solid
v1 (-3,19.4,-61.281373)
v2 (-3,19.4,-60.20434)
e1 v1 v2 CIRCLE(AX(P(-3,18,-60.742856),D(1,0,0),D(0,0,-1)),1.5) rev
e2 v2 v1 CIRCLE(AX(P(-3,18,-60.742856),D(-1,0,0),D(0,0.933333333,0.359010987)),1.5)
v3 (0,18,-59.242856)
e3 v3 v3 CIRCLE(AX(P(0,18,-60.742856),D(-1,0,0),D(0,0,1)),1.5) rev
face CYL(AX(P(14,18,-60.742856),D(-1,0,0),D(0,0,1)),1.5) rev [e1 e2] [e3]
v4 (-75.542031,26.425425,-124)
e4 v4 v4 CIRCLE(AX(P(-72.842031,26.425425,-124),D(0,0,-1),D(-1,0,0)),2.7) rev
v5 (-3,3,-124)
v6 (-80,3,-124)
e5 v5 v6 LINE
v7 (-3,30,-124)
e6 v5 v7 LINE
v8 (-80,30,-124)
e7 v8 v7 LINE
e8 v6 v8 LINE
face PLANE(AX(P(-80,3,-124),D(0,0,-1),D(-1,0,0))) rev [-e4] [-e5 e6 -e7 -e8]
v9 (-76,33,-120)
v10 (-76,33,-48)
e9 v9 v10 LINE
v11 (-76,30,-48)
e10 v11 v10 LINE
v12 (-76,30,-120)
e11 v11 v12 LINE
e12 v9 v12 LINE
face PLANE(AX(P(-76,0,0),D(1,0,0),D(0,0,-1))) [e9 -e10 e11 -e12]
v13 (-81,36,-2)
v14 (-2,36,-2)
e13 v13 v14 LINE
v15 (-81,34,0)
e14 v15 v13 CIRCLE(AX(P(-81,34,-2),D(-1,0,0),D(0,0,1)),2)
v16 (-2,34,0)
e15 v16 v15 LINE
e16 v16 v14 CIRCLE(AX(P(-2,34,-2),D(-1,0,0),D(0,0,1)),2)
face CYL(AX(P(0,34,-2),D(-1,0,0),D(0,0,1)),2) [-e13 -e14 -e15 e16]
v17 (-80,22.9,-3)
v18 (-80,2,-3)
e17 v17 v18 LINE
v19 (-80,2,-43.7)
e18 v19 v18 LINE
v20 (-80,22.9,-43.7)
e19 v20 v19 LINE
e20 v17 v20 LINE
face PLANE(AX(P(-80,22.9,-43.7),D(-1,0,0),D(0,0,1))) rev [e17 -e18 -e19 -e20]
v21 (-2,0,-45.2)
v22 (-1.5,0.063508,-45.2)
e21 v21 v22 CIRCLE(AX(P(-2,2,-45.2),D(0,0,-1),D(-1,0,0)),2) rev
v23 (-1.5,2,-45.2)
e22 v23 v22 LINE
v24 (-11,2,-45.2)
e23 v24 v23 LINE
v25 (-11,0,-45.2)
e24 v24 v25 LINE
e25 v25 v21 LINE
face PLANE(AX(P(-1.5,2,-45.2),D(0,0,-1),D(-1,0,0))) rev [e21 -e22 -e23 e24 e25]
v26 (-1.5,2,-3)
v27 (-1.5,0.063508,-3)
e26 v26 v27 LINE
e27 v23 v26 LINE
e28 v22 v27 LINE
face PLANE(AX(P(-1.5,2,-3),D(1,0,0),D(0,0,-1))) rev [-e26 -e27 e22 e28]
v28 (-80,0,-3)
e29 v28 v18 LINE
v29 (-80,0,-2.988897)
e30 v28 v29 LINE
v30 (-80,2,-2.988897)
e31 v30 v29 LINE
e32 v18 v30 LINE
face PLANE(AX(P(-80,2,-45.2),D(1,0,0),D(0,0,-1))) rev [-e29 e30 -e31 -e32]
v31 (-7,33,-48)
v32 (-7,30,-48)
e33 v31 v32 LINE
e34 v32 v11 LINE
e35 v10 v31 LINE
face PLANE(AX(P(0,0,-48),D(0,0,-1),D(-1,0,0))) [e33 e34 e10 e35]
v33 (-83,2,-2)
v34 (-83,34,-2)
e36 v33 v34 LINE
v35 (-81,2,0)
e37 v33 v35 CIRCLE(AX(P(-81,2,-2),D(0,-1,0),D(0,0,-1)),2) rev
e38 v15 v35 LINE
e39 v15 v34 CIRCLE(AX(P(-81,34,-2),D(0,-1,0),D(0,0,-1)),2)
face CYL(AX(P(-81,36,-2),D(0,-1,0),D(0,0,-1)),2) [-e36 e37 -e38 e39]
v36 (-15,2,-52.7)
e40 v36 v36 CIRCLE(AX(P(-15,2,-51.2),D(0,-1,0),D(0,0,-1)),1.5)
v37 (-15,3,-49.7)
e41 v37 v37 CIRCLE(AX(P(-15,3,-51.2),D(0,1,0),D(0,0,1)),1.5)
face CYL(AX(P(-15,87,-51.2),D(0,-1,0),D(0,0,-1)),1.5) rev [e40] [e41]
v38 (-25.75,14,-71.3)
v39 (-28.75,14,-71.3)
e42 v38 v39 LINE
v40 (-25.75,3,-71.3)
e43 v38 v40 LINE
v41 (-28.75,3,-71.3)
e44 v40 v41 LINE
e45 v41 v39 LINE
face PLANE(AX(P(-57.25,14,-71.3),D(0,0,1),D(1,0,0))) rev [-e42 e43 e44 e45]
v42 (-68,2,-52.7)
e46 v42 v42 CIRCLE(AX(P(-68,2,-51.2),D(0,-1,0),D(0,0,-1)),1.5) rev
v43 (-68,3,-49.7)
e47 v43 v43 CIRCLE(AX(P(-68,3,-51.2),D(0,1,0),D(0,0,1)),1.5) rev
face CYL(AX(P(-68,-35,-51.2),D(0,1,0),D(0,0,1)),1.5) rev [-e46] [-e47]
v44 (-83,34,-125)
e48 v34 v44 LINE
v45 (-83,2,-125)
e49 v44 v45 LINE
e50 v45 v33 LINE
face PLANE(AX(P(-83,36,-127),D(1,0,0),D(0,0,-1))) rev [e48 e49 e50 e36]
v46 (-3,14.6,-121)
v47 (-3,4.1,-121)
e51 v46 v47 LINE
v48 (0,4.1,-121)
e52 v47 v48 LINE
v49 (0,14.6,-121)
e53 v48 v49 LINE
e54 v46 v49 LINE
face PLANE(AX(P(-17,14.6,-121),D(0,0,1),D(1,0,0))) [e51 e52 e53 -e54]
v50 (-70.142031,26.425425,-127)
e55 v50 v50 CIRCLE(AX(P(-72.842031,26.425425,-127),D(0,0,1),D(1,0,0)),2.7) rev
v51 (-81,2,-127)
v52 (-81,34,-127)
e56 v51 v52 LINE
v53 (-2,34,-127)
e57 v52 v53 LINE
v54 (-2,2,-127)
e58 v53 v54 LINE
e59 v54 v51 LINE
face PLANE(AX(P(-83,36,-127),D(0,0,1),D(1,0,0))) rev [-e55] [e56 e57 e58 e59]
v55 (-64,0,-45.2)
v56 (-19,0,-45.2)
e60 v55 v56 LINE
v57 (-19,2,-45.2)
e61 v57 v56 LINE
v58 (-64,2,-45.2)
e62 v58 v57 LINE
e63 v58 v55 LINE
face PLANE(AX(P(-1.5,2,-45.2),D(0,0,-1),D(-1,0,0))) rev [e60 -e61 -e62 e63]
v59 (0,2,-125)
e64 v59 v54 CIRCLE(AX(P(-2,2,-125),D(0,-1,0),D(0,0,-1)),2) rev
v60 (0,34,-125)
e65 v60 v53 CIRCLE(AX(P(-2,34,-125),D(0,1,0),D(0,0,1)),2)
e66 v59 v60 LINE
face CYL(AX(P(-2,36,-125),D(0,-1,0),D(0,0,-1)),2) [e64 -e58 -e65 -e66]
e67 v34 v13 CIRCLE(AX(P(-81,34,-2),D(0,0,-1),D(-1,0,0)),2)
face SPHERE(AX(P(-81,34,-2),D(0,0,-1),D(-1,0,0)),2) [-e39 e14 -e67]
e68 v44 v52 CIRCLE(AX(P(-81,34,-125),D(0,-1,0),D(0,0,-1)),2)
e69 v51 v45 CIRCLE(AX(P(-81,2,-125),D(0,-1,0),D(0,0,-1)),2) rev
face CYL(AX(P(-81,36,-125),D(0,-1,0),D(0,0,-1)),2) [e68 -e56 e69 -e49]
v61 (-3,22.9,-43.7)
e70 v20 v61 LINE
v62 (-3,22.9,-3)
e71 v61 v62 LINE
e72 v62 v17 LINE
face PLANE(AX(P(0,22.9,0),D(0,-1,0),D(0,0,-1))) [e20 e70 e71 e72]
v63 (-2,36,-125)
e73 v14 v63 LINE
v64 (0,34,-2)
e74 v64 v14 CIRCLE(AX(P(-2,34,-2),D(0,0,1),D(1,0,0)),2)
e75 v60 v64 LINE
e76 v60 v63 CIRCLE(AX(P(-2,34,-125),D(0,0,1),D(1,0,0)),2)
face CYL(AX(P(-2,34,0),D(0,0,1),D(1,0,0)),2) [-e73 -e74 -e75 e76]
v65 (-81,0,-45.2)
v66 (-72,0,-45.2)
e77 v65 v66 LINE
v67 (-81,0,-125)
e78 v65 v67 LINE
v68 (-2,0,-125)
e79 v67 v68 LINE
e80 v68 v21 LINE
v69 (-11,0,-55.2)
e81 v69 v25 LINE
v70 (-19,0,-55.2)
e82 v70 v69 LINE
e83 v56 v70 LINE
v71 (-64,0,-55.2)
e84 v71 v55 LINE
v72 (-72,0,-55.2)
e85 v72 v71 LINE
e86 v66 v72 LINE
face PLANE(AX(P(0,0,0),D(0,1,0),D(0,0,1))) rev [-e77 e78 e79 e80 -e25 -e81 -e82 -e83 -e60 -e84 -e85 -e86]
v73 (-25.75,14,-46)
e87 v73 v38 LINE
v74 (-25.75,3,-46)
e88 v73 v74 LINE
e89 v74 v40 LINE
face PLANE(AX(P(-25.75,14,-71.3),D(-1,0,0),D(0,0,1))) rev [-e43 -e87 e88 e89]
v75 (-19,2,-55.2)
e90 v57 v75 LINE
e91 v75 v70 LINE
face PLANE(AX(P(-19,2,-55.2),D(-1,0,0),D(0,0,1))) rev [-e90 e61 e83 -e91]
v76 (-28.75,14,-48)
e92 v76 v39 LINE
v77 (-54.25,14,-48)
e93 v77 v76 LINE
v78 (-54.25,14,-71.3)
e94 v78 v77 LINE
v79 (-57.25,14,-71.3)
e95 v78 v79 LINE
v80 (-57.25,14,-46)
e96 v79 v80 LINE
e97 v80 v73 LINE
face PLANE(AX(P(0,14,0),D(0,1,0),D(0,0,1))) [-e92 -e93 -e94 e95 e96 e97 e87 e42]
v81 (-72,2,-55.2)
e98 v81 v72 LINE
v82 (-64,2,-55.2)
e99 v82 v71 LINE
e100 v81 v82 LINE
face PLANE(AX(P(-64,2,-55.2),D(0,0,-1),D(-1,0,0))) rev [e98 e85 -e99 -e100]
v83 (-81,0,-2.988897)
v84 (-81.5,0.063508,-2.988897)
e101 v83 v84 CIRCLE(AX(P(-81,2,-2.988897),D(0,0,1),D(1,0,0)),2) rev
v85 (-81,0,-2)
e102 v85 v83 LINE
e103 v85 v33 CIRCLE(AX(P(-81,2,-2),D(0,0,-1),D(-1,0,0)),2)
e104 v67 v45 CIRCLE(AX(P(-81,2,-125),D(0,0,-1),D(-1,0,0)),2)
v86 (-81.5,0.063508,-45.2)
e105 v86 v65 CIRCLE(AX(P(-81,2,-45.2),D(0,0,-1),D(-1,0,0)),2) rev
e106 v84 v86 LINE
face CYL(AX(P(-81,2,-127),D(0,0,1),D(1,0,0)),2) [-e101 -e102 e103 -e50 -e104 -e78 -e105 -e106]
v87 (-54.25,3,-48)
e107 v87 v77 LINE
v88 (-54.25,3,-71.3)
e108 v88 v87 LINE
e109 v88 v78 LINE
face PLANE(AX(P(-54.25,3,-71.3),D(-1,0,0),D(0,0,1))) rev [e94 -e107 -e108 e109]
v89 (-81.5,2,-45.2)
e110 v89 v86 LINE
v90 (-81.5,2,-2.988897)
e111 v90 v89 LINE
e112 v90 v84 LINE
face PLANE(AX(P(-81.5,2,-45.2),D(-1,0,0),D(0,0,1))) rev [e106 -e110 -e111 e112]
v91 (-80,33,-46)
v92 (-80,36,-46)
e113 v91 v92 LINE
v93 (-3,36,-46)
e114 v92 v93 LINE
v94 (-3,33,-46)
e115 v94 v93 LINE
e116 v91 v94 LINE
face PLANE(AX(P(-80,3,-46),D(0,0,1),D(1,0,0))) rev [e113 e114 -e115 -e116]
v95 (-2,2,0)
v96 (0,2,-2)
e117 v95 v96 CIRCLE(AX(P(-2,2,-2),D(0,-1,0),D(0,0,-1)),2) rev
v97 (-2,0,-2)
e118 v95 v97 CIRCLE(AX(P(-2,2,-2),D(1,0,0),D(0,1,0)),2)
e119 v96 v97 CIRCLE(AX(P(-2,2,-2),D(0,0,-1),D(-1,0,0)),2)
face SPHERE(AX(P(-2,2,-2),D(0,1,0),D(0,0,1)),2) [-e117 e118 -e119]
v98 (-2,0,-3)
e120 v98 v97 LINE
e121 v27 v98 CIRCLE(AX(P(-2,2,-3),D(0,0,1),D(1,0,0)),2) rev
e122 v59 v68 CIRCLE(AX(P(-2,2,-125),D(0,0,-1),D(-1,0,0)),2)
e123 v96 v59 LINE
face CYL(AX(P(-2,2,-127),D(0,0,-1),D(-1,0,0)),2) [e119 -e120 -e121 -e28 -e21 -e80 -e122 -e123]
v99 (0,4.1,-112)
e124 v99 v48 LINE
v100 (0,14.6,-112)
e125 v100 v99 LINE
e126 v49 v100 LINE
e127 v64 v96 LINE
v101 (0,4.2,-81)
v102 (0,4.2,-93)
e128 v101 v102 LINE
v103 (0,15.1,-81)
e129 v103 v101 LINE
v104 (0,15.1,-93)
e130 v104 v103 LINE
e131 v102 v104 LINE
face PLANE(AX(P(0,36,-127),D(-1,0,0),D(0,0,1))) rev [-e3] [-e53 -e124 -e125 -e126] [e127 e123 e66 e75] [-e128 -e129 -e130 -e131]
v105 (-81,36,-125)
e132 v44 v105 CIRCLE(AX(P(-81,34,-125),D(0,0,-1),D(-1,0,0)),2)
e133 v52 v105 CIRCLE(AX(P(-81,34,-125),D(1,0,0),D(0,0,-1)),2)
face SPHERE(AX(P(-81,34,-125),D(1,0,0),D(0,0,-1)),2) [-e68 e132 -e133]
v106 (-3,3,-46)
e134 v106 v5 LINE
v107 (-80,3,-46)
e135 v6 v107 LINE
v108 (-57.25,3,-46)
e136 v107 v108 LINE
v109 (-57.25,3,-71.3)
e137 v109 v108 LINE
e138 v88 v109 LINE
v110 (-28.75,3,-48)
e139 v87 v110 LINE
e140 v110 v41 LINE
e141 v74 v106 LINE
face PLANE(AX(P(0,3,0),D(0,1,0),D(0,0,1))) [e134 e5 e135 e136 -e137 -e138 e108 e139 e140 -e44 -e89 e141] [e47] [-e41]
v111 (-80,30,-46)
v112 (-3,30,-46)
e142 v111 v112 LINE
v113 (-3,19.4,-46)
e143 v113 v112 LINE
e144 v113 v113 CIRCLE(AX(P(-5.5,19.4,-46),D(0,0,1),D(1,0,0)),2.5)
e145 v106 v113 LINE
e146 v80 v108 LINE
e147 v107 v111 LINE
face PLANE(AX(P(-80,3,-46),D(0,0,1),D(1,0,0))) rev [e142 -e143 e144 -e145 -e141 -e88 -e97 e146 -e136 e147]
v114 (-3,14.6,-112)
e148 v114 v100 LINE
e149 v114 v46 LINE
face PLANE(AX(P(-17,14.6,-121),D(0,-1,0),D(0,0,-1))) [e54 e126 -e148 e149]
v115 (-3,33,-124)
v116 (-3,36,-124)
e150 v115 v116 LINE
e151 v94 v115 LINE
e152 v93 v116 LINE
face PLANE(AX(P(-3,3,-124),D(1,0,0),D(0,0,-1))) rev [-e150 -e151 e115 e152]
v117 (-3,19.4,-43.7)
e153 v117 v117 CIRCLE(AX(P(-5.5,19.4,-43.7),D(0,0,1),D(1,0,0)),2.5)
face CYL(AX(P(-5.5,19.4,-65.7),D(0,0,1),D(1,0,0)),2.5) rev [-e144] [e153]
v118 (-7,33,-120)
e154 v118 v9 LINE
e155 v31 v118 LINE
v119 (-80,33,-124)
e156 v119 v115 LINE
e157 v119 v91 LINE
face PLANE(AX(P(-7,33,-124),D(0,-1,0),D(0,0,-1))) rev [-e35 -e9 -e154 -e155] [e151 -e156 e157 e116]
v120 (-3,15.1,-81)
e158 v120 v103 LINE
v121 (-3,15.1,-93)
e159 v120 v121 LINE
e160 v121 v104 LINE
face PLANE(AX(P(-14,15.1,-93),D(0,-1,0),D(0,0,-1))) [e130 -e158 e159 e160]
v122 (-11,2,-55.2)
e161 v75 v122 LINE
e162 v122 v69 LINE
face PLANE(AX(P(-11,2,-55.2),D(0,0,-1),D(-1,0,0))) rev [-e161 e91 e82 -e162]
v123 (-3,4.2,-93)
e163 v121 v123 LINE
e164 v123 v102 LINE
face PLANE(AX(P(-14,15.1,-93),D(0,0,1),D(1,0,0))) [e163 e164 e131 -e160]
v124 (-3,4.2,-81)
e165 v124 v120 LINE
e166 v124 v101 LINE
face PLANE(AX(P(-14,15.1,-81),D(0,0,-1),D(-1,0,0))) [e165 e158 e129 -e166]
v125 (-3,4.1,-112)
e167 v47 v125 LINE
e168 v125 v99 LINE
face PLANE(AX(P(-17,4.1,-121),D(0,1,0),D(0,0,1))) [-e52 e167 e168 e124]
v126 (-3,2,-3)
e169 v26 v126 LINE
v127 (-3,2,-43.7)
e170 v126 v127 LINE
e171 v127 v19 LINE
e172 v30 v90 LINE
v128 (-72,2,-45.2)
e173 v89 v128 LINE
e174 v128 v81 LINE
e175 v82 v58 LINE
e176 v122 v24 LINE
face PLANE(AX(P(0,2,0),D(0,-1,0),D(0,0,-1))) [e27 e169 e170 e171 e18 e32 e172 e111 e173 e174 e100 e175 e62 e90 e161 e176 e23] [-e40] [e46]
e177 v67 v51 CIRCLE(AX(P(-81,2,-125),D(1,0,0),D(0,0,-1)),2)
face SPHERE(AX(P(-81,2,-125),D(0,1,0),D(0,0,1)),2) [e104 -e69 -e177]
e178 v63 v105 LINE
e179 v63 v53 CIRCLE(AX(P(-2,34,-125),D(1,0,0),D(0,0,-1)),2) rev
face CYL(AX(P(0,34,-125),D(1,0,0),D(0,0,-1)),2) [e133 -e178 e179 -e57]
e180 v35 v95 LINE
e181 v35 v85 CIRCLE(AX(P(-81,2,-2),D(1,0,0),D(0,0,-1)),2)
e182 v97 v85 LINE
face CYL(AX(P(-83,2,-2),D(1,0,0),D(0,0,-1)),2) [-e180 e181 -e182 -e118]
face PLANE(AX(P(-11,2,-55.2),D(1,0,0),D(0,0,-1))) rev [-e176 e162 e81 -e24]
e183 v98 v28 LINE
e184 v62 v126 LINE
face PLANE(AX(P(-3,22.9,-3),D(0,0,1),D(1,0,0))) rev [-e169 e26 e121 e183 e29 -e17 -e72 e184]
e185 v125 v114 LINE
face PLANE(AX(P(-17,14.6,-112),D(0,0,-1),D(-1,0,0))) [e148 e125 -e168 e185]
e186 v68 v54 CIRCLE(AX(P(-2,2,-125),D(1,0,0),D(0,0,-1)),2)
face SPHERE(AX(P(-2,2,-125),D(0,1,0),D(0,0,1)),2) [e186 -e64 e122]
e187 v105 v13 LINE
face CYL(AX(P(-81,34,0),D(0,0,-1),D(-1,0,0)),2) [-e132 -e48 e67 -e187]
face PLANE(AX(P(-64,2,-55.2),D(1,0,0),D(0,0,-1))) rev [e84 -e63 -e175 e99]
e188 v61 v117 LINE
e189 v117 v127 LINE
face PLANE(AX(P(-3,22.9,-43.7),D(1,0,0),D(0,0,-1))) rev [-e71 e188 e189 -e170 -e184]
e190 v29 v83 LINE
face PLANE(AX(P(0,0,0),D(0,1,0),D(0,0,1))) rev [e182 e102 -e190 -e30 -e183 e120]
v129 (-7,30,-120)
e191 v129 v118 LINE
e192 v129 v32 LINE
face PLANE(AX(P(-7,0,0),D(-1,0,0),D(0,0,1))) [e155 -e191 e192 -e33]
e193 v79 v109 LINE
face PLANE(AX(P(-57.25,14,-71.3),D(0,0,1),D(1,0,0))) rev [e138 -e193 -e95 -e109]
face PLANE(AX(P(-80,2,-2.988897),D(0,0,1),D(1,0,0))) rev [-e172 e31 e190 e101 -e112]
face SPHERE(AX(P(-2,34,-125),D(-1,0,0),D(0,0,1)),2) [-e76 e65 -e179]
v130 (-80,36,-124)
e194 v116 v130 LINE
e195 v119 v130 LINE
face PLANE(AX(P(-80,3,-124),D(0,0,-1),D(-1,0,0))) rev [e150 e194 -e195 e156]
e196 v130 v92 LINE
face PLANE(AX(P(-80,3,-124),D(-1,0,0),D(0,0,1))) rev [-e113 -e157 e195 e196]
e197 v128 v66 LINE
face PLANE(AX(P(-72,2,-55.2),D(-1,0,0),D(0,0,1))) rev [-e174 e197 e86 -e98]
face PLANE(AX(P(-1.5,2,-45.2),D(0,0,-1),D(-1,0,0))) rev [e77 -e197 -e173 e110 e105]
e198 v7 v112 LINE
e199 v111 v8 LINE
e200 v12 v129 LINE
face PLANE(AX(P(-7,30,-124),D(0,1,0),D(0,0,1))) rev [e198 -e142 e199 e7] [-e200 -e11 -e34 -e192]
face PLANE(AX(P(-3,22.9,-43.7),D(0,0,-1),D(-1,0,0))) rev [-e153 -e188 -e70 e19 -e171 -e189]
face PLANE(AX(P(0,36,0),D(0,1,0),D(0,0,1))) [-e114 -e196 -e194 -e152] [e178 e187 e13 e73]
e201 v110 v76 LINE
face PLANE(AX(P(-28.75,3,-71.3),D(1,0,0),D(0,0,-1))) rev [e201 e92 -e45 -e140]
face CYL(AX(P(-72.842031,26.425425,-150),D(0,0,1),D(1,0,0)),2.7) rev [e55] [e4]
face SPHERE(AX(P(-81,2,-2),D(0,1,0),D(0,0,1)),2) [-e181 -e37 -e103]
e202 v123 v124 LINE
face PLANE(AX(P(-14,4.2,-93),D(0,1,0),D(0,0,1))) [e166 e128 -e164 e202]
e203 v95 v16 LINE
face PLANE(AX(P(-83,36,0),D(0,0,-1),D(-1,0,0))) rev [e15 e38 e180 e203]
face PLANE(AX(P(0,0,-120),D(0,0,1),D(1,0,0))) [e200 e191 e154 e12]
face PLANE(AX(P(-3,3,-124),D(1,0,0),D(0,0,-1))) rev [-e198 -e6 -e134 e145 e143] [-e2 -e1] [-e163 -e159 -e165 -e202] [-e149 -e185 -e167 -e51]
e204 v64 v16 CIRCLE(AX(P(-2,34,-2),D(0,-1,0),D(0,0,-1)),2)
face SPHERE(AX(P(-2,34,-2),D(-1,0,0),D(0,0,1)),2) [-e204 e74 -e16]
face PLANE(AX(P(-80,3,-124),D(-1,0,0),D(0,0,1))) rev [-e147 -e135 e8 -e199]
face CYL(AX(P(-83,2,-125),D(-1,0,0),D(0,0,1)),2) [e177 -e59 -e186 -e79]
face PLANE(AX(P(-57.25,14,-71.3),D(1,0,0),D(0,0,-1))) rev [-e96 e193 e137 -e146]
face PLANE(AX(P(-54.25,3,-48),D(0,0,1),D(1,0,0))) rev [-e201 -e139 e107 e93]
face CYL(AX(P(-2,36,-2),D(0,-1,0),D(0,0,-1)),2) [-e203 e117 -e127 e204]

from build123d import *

# Parameters (mm, degrees)
SKETCH_1_W                = 83
SKETCH_1_H                = 127
EXTRUDE_1_DEPTH           = 36
SKETCH_2_W                = 77
SKETCH_2_H                = 40.7
CUT_EXTRUDE_1_DEPTH       = 22.9
SKETCH_3_W                = 77
SKETCH_3_H                = 78
CUT_EXTRUDE_4_DEPTH       = 33
SKETCH_4_W                = 31.5
SKETCH_4_H                = 25.3
EXTRUDE_2_DEPTH           = 11
SKETCH_5_W                = 25.5
SKETCH_5_H                = 23.3
CUT_EXTRUDE_5_DEPTH       = 11
CUT_EXTRUDE_6_DEPTH       = 14
CUT_EXTRUDE_6_DEPTH_BACK  = 10
SKETCH_6_R                = 1.5
SKETCH_7_R                = 2.5
CUT_EXTRUDE_7_DEPTH       = 22
CUT_EXTRUDE_8_DEPTH       = 23
CUT_EXTRUDE_8_DEPTH_BACK  = 30
SKETCH_8_R                = 2.7
CUT_EXTRUDE_9_DEPTH       = 11
CUT_EXTRUDE_9_DEPTH_BACK  = 33
SKETCH_9_W                = 12
SKETCH_9_H                = 10.9
CUT_EXTRUDE_10_DEPTH      = 14
CUT_EXTRUDE_10_DEPTH_BACK = 36
SKETCH_10_W               = 9
SKETCH_10_H               = 10.5
SKETCH_11_W               = 78
SKETCH_11_H               = 3
EXTRUDE_3_DEPTH           = 4
SKETCH_12_W               = 69
SKETCH_12_H               = 3
EXTRUDE_4_DEPTH           = 4
SKETCH_13_W               = 78
SKETCH_13_H               = 3
EXTRUDE_5_DEPTH           = 4
SKETCH_15_W               = 69
SKETCH_15_H               = 3
EXTRUDE_6_DEPTH           = 2
SKETCH_16_W               = 1.5
SKETCH_16_H               = 41.5
CUT_EXTRUDE_11_DEPTH      = 2
SKETCH_17_W               = 78.5
SKETCH_17_H               = 1.5
CUT_EXTRUDE_12_DEPTH      = 2
SKETCH_19_W               = 1.5
SKETCH_19_H               = 42.211102857
CUT_EXTRUDE_13_DEPTH      = 2
FILLET_1_R                = 2
FILLET_2_R                = 2
FILLET_3_R                = 2
FILLET_4_R                = 2
FILLET_5_R                = 2
SKETCH_20_W               = 8
SKETCH_20_H               = 10
CUT_EXTRUDE_14_DEPTH      = 2
SKETCH_21_W               = 8
SKETCH_21_H               = 10
CUT_EXTRUDE_15_DEPTH      = 2
CUT_EXTRUDE_16_DEPTH      = 102
CUT_EXTRUDE_16_DEPTH_BACK = 85
SKETCH_22_R               = 1.5
CUT_EXTRUDE_17_DEPTH      = 37
CUT_EXTRUDE_17_DEPTH_BACK = 68
SKETCH_23_R               = 1.5


with BuildPart() as part:
    # Эскиз1 → Бобышка-Вытянуть1 (new body)
    with BuildSketch(Plane(origin=(0, 0, 0), x_dir=(1, 0, 0), z_dir=(0, 1, 0))):
        with Locations((-41.5, 63.5)):
            Rectangle(SKETCH_1_W, SKETCH_1_H)
    extrude(amount=EXTRUDE_1_DEPTH)

    # Эскиз2 → Вырез-Вытянуть1 (cut)
    with BuildSketch(Plane(origin=(0, 0, 0), x_dir=(-1, 0, 0), z_dir=(0, -1, 0))):
        with Locations((41.5, 23.35)):
            Rectangle(SKETCH_2_W, SKETCH_2_H)
    extrude(amount=-CUT_EXTRUDE_1_DEPTH, mode=Mode.SUBTRACT)

    # Эскиз3 → Вырез-Вытянуть4 (cut)
    with BuildSketch(Plane(origin=(0, 36, 0), x_dir=(1, 0, 0), z_dir=(0, 1, 0))):
        with Locations((-41.5, 85)):
            Rectangle(SKETCH_3_W, SKETCH_3_H)
    extrude(amount=-CUT_EXTRUDE_4_DEPTH, mode=Mode.SUBTRACT)

    # Эскиз4 → Бобышка-Вытянуть2 (add)
    with BuildSketch(Plane(origin=(0, 3, 0), x_dir=(1, 0, 0), z_dir=(0, 1, 0))):
        with Locations((-41.5, 58.65)):
            Rectangle(SKETCH_4_W, SKETCH_4_H)
    extrude(amount=EXTRUDE_2_DEPTH)

    # Эскиз5 → Вырез-Вытянуть5 (cut)
    with BuildSketch(Plane(origin=(0, 14, 0), x_dir=(1, 0, 0), z_dir=(0, 1, 0))):
        with Locations((-41.5, 59.65)):
            Rectangle(SKETCH_5_W, SKETCH_5_H)
    extrude(amount=-CUT_EXTRUDE_5_DEPTH, mode=Mode.SUBTRACT)

    # Эскиз6 → Вырез-Вытянуть6 (cut, two sides: drawn at the far end of the back side and taken through both)
    with BuildSketch(Plane(origin=(0, 0, 0), x_dir=(0, 0, -1), z_dir=(1, 0, 0)).offset(-CUT_EXTRUDE_6_DEPTH_BACK)):
        with Locations(Location((60.742856383, 18, 0), (0, 0, 180))):
            Circle(SKETCH_6_R)
    extrude(amount=CUT_EXTRUDE_6_DEPTH + CUT_EXTRUDE_6_DEPTH_BACK, mode=Mode.SUBTRACT)

    # Эскиз7 → Вырез-Вытянуть7 (cut)
    with BuildSketch(Plane.XY.offset(-43.7)):
        with Locations((-5.5, 19.4)):
            Circle(SKETCH_7_R)
    extrude(amount=-CUT_EXTRUDE_7_DEPTH, mode=Mode.SUBTRACT)

    # Эскиз8 → Вырез-Вытянуть8 (cut, two sides: drawn at the far end of the back side and taken through both)
    with BuildSketch(Plane(origin=(0, 0, -127), x_dir=(-1, 0, 0), z_dir=(0, 0, -1)).offset(-CUT_EXTRUDE_8_DEPTH_BACK)):
        with Locations(Location((72.842031124, 26.425424665, 0), (0, 0, 180))):
            Circle(SKETCH_8_R)
    extrude(amount=CUT_EXTRUDE_8_DEPTH + CUT_EXTRUDE_8_DEPTH_BACK, mode=Mode.SUBTRACT)

    # Эскиз9 → Вырез-Вытянуть9 (cut, two sides: drawn at the far end of the back side and taken through both)
    with BuildSketch(Plane.ZY.offset(3).offset(-CUT_EXTRUDE_9_DEPTH_BACK)):
        with Locations((-87, 9.65)):
            Rectangle(SKETCH_9_W, SKETCH_9_H)
    extrude(amount=CUT_EXTRUDE_9_DEPTH + CUT_EXTRUDE_9_DEPTH_BACK, mode=Mode.SUBTRACT)

    # Эскиз10 → Вырез-Вытянуть10 (cut, two sides: drawn at the far end of the back side and taken through both)
    with BuildSketch(Plane.ZY.offset(3).offset(-CUT_EXTRUDE_10_DEPTH_BACK)):
        with Locations((-116.5, 9.35)):
            Rectangle(SKETCH_10_W, SKETCH_10_H)
    extrude(amount=CUT_EXTRUDE_10_DEPTH + CUT_EXTRUDE_10_DEPTH_BACK, mode=Mode.SUBTRACT)

    # Эскиз11 → Бобышка-Вытянуть3 (add)
    with BuildSketch(Plane.ZY.offset(3)):
        with Locations((-85, 31.5)):
            Rectangle(SKETCH_11_W, SKETCH_11_H)
    extrude(amount=EXTRUDE_3_DEPTH)

    # Эскиз12 → Бобышка-Вытянуть4 (add)
    with BuildSketch(Plane.XY.offset(-124)):
        with Locations((-41.5, 31.5)):
            Rectangle(SKETCH_12_W, SKETCH_12_H)
    extrude(amount=EXTRUDE_4_DEPTH)

    # Эскиз13 → Бобышка-Вытянуть5 (add)
    with BuildSketch(Plane(origin=(-80, 0, 0), x_dir=(0, 0, -1), z_dir=(1, 0, 0))):
        with Locations((85, 31.5)):
            Rectangle(SKETCH_13_W, SKETCH_13_H)
    extrude(amount=EXTRUDE_5_DEPTH)

    # Эскиз15 → Бобышка-Вытянуть6 (add)
    with BuildSketch(Plane(origin=(0, 0, -46), x_dir=(-1, 0, 0), z_dir=(0, 0, -1))):
        with Locations((41.5, 31.5)):
            Rectangle(SKETCH_15_W, SKETCH_15_H)
    extrude(amount=EXTRUDE_6_DEPTH)

    # Эскиз16 → Вырез-Вытянуть11 (cut)
    with BuildSketch(Plane(origin=(0, 0, 0), x_dir=(-1, 0, 0), z_dir=(0, -1, 0))):
        with Locations((2.25, 23.75)):
            Rectangle(SKETCH_16_W, SKETCH_16_H)
    extrude(amount=-CUT_EXTRUDE_11_DEPTH, mode=Mode.SUBTRACT)

    # Эскиз17 → Вырез-Вытянуть12 (cut)
    with BuildSketch(Plane.XZ):
        with Locations((-40.75, -44.45)):
            Rectangle(SKETCH_17_W, SKETCH_17_H)
    extrude(amount=-CUT_EXTRUDE_12_DEPTH, mode=Mode.SUBTRACT)

    # Эскиз19 → Вырез-Вытянуть13 (cut)
    with BuildSketch(Plane.XZ):
        with Locations((-80.75, -24.094448572)):
            Rectangle(SKETCH_19_W, SKETCH_19_H)
    extrude(amount=-CUT_EXTRUDE_13_DEPTH, mode=Mode.SUBTRACT)

    # Скругление1
    fillet_1_edges = [part.edges().sort_by_distance(p)[0] for p in [
        (-41.5, 36, -127),
    ]]
    fillet(fillet_1_edges, radius=FILLET_1_R)

    # Скругление2
    fillet_2_edges = [part.edges().sort_by_distance(p)[0] for p in [
        (-83, 36, -62.5),
        (-83, 17, -127),
        (-83, 35.414213562, -126.414213562),
    ]]
    fillet(fillet_2_edges, radius=FILLET_2_R)

    # Скругление3
    fillet_3_edges = [part.edges().sort_by_distance(p)[0] for p in [
        (-83, 17, 0),
        (-40.5, 36, 0),
        (-82.414213562, 35.414213562, 0),
    ]]
    fillet(fillet_3_edges, radius=FILLET_3_R)

    # Скругление4
    fillet_4_edges = [part.edges().sort_by_distance(p)[0] for p in [
        (0, 17, -127),
        (0, 35.414213562, -126.414213562),
        (0, 17, 0),
        (0, 36, -63.5),
        (0, 35.414213562, -0.585786438),
    ]]
    fillet(fillet_4_edges, radius=FILLET_4_R)

    # Скругление5
    # the kernel refuses this fillet: 2 mm, written as the material it takes off along each edge
    with BuildSketch(Plane(origin=(-2, 0, -125), x_dir=(1, 0, 0), z_dir=(0, 0, 1))) as fillet_5_piece_1:
        with BuildLine():
            CenterArc((2 - FILLET_5_R, FILLET_5_R), FILLET_5_R, 270, 90)
            Line((2, FILLET_5_R), (2, 0))
            Line((2, 0), (2 - FILLET_5_R, 0))
        make_face()
    revolve(axis=Axis((-2, 0, -125), (0, 1, 0)), revolution_arc=90, mode=Mode.SUBTRACT)
    with BuildSketch(Plane(origin=(0, 0, -125), x_dir=(0, 1, 0), z_dir=(0, 0, 1))) as fillet_5_piece_2:
        with BuildLine():
            CenterArc((FILLET_5_R, FILLET_5_R), FILLET_5_R, 180, 90)
            Line((0, FILLET_5_R), (0, 0))
            Line((0, 0), (FILLET_5_R, 0))
        make_face()
    extrude(amount=123, mode=Mode.SUBTRACT)
    with BuildSketch(Plane(origin=(-2, 0, -2), x_dir=(1, 0, 0), z_dir=(0, 0, -1))) as fillet_5_piece_3:
        with BuildLine():
            CenterArc((2 - FILLET_5_R, -FILLET_5_R), FILLET_5_R, 0, 90)
            Line((2, -FILLET_5_R), (2, 0))
            Line((2, 0), (2 - FILLET_5_R, 0))
        make_face()
    revolve(axis=Axis((-2, 0, -2), (0, -1, 0)), revolution_arc=90, mode=Mode.SUBTRACT)
    with BuildSketch(Plane(origin=(-2, 0, 0), x_dir=(0, 0, -1), z_dir=(-1, 0, 0)), Plane(origin=(-81, 0, -127), x_dir=(0, 0, 1), z_dir=(1, 0, 0))) as fillet_5_piece_4:
        with BuildLine():
            CenterArc((FILLET_5_R, -FILLET_5_R), FILLET_5_R, 90, 90)
            Line((0, -FILLET_5_R), (0, 0))
            Line((0, 0), (FILLET_5_R, 0))
        make_face()
    extrude(amount=79, mode=Mode.SUBTRACT)
    with BuildSketch(Plane(origin=(-81, 0, -2), x_dir=(-1, 0, 0), z_dir=(0, 0, -1))) as fillet_5_piece_5:
        with BuildLine():
            CenterArc((2 - FILLET_5_R, FILLET_5_R), FILLET_5_R, 270, 90)
            Line((2, FILLET_5_R), (2, 0))
            Line((2, 0), (2 - FILLET_5_R, 0))
        make_face()
    revolve(axis=Axis((-81, 0, -2), (0, 1, 0)), revolution_arc=90, mode=Mode.SUBTRACT)
    with BuildSketch(Plane(origin=(-83, 0, -2), x_dir=(1, 0, 0), z_dir=(0, 0, -1))) as fillet_5_piece_6:
        with BuildLine():
            CenterArc((FILLET_5_R, -FILLET_5_R), FILLET_5_R, 90, 90)
            Line((0, -FILLET_5_R), (0, 0))
            Line((0, 0), (FILLET_5_R, 0))
        make_face()
    extrude(amount=123, mode=Mode.SUBTRACT)
    with BuildSketch(Plane(origin=(-81, 0, -125), x_dir=(-1, 0, 0), z_dir=(0, 0, 1))) as fillet_5_piece_7:
        with BuildLine():
            CenterArc((2 - FILLET_5_R, -FILLET_5_R), FILLET_5_R, 0, 90)
            Line((2, -FILLET_5_R), (2, 0))
            Line((2, 0), (2 - FILLET_5_R, 0))
        make_face()
    revolve(axis=Axis((-81, 0, -125), (0, -1, 0)), revolution_arc=90, mode=Mode.SUBTRACT)

    # Эскиз20 → Вырез-Вытянуть14 (cut)
    with BuildSketch(Plane.XZ):
        with Locations((-15, -50.2)):
            Rectangle(SKETCH_20_W, SKETCH_20_H)
    extrude(amount=-CUT_EXTRUDE_14_DEPTH, mode=Mode.SUBTRACT)

    # Эскиз21 → Вырез-Вытянуть15 (cut)
    with BuildSketch(Plane.XZ):
        with Locations((-68, -50.2)):
            Rectangle(SKETCH_21_W, SKETCH_21_H)
    extrude(amount=-CUT_EXTRUDE_15_DEPTH, mode=Mode.SUBTRACT)

    # Эскиз22 → Вырез-Вытянуть16 (cut, two sides: drawn at the far end of the back side and taken through both)
    with BuildSketch(Plane.XZ.offset(-2).offset(-CUT_EXTRUDE_16_DEPTH_BACK)):
        with Locations(Location((-15, -51.2, 0), (0, 0, 270))):
            Circle(SKETCH_22_R)
    extrude(amount=CUT_EXTRUDE_16_DEPTH + CUT_EXTRUDE_16_DEPTH_BACK, mode=Mode.SUBTRACT)

    # Эскиз23 → Вырез-Вытянуть17 (cut, two sides: drawn at the far end of the back side and taken through both)
    with BuildSketch(Plane.XZ.offset(-2).offset(-CUT_EXTRUDE_17_DEPTH_BACK)):
        with Locations(Location((-68, -51.2, 0), (0, 0, 90))):
            Circle(SKETCH_23_R)
    extrude(amount=CUT_EXTRUDE_17_DEPTH + CUT_EXTRUDE_17_DEPTH_BACK, mode=Mode.SUBTRACT)


solid = part.part
